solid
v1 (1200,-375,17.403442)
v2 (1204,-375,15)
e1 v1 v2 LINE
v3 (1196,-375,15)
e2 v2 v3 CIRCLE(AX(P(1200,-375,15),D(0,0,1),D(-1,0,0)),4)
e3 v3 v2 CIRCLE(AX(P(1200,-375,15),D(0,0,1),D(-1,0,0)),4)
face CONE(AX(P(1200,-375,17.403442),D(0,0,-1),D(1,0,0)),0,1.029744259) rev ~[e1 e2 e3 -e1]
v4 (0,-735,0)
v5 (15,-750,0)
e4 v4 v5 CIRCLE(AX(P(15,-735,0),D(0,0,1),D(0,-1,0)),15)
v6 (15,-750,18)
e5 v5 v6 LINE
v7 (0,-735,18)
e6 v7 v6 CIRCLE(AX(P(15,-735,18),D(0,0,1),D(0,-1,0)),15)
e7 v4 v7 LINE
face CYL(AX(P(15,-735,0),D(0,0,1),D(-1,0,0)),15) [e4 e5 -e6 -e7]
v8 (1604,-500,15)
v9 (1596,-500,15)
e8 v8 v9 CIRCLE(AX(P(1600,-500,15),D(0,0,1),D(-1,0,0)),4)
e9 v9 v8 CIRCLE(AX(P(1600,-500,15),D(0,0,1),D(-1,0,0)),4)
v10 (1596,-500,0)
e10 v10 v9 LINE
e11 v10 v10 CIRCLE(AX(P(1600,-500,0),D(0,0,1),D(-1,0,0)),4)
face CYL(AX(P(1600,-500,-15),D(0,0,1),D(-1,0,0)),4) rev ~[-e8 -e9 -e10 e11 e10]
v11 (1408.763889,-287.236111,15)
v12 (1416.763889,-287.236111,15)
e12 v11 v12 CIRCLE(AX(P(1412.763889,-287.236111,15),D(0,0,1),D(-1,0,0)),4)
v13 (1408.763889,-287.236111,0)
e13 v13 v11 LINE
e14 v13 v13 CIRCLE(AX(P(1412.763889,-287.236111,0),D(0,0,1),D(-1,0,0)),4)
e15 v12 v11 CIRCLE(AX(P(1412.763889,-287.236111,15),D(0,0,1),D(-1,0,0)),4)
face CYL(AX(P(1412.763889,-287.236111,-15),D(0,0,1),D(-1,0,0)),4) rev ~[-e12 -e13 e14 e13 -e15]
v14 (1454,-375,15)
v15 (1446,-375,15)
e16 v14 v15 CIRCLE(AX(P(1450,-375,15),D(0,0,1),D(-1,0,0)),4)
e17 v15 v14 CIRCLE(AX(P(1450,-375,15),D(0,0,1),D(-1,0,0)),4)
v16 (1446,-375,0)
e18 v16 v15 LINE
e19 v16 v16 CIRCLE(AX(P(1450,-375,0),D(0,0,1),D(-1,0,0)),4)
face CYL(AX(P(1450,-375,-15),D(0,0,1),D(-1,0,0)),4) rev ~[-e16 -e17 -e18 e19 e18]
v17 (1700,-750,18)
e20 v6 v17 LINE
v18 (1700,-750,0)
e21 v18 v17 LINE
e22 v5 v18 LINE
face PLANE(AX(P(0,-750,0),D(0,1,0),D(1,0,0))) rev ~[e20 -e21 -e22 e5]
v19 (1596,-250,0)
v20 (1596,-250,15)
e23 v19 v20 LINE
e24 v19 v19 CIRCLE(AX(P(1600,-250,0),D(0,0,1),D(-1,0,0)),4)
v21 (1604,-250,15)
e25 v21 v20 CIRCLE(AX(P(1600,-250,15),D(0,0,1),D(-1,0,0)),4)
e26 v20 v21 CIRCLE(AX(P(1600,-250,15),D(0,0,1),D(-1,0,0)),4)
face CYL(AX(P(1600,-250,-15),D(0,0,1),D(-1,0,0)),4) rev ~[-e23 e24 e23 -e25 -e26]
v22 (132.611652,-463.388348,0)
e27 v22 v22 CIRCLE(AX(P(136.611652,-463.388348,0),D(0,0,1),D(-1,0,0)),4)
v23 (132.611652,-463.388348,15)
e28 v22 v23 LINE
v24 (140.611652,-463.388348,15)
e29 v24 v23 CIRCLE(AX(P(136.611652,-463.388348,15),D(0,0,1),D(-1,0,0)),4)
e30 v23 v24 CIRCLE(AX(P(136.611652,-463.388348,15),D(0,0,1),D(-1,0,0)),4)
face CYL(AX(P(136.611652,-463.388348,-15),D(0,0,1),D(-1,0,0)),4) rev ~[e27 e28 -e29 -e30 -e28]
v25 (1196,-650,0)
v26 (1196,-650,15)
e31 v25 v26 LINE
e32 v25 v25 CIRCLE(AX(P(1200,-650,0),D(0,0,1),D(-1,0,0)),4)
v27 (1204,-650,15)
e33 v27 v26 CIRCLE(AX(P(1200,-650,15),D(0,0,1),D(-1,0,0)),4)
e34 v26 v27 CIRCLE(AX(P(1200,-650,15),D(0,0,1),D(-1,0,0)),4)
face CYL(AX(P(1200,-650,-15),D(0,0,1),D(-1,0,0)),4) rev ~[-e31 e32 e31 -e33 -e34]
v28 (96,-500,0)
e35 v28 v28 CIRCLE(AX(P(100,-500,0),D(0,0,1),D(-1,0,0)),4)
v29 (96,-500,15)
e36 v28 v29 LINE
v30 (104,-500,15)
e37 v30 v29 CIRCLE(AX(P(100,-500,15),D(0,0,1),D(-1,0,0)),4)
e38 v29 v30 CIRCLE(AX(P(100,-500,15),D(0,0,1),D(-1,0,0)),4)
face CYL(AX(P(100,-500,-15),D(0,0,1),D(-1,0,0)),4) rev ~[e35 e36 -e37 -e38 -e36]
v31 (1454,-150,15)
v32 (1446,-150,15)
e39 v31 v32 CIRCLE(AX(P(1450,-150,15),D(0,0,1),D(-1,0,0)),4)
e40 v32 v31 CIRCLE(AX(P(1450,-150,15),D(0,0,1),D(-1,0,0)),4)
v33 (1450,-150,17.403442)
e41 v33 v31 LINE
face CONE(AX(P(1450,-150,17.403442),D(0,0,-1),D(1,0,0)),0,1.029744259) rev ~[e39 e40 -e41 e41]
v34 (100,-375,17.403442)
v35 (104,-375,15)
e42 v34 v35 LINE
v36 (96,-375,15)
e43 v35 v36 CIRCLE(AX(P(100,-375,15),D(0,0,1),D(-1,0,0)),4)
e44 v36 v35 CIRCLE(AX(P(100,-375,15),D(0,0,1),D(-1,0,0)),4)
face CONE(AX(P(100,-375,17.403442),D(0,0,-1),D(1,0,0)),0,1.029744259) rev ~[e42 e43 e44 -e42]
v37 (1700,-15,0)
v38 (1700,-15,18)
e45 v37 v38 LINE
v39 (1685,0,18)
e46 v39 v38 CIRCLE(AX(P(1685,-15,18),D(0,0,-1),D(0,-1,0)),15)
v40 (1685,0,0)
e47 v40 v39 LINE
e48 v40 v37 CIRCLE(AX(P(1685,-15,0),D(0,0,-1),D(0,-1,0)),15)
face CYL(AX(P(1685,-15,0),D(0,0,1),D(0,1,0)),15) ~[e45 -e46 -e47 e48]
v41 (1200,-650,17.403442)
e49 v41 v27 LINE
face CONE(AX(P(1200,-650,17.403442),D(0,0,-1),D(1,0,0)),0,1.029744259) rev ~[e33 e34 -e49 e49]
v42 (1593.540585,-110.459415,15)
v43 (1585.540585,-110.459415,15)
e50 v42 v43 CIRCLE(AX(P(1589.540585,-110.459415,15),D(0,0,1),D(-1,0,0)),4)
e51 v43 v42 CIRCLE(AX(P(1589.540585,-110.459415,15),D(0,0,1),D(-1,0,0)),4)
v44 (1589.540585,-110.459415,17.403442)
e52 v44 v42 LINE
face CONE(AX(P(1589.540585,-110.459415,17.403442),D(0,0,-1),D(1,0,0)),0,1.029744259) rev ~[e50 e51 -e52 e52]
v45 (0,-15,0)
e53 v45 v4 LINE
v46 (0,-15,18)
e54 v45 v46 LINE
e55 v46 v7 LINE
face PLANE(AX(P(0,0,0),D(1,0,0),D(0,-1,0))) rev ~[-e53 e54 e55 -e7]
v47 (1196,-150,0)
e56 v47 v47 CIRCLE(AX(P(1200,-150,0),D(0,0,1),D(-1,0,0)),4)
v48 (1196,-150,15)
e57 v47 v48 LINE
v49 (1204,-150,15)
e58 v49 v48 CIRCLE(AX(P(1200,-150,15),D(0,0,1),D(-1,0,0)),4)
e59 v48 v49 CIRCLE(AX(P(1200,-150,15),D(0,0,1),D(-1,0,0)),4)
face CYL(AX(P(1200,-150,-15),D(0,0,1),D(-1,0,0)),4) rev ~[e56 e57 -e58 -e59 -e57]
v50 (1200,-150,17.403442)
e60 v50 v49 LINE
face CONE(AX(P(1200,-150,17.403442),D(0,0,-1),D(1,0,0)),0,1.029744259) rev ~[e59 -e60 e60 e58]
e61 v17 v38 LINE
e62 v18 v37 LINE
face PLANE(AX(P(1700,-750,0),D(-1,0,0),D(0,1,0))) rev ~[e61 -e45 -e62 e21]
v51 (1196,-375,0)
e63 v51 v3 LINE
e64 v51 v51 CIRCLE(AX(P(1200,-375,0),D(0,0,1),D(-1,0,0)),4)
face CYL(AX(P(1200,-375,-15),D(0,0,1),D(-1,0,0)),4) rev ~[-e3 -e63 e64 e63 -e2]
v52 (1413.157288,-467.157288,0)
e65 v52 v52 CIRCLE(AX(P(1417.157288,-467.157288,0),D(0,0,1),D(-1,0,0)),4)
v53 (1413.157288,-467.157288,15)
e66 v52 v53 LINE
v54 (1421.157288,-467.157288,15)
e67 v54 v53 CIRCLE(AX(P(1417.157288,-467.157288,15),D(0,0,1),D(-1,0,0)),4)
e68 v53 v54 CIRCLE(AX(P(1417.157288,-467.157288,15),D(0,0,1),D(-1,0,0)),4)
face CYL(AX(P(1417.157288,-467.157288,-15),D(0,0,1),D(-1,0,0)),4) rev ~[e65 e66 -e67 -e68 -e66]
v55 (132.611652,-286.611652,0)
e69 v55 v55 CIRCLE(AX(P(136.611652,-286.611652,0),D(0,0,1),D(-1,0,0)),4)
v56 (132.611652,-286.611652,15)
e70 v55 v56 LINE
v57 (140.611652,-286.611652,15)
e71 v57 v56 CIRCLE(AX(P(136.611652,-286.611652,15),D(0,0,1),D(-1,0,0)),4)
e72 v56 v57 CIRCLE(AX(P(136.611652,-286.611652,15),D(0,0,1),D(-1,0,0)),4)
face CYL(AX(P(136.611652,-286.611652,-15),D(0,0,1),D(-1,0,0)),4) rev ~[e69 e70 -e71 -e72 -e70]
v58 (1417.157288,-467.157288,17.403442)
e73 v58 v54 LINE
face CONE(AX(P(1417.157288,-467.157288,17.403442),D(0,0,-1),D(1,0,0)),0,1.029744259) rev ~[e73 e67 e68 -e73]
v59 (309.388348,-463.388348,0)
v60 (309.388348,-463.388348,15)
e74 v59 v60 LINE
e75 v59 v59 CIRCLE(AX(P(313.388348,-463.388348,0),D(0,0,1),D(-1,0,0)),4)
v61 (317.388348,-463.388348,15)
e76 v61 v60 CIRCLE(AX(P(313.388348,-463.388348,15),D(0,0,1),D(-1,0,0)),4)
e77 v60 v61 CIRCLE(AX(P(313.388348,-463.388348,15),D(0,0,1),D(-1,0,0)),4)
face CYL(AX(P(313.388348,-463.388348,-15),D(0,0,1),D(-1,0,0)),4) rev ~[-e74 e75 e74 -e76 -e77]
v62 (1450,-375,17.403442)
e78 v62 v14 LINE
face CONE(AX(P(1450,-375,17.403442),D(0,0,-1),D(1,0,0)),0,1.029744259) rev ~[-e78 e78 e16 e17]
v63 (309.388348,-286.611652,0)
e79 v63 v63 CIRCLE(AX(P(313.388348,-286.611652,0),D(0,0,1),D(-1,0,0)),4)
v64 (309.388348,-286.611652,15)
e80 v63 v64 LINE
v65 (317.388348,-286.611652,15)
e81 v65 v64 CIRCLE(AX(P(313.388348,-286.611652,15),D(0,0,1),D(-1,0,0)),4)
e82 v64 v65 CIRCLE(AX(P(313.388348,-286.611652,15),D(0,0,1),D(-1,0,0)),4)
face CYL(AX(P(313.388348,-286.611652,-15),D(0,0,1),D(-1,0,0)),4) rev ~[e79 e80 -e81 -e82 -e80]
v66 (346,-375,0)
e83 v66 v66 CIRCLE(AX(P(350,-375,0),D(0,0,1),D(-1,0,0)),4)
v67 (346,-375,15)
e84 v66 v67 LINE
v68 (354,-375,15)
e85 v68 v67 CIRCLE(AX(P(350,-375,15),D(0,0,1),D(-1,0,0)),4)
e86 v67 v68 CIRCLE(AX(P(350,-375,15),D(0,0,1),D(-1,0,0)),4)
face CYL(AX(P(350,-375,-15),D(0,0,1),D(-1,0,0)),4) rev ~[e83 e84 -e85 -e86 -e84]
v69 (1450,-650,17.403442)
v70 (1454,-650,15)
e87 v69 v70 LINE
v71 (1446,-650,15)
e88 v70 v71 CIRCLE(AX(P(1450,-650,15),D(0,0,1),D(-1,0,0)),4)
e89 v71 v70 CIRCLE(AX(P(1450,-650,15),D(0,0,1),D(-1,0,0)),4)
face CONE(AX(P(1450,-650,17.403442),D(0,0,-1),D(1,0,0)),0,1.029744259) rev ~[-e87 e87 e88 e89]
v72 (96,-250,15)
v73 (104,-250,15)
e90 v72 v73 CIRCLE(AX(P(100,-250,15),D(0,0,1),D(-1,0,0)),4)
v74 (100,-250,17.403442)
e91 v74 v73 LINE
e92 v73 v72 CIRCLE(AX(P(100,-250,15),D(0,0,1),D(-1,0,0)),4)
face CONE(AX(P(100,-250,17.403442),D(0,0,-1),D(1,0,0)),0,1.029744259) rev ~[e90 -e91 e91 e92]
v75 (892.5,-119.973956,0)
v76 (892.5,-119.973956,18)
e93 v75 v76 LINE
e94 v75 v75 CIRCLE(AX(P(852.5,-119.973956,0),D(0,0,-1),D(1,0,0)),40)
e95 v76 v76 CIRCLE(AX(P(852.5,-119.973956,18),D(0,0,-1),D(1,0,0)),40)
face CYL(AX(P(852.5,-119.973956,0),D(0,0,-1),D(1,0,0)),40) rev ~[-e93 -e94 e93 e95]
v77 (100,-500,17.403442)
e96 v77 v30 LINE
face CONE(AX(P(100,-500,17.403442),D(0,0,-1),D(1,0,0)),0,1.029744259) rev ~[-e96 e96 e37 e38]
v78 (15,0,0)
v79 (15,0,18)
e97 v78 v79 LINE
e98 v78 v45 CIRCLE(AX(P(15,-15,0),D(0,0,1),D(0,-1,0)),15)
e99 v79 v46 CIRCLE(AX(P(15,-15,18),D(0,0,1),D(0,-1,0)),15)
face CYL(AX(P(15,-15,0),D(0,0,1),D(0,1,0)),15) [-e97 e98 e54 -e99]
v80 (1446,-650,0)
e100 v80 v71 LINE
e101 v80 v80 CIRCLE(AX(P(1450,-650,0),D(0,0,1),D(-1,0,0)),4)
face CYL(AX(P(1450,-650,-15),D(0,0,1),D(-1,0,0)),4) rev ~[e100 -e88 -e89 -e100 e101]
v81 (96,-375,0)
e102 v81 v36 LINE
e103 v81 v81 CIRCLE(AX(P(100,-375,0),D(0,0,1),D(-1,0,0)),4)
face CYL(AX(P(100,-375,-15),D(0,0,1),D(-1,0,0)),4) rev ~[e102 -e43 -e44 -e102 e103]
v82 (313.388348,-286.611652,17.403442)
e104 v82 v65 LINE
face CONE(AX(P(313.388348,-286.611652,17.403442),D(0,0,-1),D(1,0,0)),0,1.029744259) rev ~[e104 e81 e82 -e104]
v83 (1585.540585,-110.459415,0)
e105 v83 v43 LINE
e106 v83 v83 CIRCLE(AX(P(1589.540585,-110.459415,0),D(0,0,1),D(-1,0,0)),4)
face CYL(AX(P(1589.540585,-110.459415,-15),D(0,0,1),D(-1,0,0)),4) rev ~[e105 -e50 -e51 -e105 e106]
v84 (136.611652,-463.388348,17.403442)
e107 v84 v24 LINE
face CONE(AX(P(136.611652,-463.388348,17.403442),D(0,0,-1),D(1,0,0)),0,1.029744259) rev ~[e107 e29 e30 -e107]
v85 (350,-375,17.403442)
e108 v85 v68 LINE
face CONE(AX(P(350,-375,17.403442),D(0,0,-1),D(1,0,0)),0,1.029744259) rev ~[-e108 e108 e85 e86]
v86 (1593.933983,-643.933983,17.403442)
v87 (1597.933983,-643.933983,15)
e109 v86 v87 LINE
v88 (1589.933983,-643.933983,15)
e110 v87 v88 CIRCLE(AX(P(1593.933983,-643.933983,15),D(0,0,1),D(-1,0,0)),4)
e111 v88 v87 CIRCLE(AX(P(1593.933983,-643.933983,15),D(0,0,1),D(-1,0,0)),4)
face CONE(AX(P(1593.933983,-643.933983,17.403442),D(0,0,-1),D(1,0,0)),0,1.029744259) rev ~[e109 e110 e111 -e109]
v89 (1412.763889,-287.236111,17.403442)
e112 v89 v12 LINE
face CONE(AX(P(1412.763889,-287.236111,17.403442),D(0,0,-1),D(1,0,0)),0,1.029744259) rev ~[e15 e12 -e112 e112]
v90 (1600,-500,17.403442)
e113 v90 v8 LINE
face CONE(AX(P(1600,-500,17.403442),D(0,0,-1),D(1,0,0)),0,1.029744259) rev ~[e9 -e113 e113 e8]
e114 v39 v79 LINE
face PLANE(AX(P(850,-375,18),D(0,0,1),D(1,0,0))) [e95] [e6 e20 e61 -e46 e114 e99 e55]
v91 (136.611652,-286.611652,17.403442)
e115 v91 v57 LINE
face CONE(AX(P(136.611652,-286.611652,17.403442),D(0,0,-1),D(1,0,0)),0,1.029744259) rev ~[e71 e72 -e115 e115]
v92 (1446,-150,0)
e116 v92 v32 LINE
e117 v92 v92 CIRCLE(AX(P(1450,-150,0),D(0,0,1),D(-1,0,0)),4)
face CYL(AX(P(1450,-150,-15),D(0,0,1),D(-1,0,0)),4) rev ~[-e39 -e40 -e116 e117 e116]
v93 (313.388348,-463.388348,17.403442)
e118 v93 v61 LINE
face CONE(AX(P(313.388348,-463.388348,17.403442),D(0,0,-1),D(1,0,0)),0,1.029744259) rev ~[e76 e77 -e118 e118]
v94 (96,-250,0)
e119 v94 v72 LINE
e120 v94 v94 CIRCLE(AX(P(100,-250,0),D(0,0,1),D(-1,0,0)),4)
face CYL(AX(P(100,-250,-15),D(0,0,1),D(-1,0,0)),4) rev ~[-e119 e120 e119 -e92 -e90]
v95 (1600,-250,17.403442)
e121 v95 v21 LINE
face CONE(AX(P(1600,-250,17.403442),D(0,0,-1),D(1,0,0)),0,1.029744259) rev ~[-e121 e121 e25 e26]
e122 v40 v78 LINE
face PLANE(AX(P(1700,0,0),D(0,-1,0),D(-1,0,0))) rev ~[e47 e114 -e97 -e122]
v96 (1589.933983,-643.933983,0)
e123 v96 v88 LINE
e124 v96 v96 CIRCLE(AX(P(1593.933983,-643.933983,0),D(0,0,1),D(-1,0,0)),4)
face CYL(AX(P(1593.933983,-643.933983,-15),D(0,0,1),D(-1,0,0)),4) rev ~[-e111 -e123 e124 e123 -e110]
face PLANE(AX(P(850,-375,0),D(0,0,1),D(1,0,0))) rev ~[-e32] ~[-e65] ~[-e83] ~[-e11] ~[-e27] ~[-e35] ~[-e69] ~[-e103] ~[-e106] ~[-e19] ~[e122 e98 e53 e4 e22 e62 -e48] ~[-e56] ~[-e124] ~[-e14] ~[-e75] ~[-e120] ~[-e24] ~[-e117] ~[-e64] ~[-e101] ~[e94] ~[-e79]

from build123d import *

# Parameters (mm, degrees)
F1_DEPTH = 18
F2_R     = 15
F4_D     = 8
F4_DEPTH = 15
F4_TIP   = 2.4034424761
F6_DEPTH = 18


# Not quite as in the source:
# - a feature names something its author has since deleted; it is built from what else it names


with BuildPart() as f1:
    # F0 (on Top) → F1 (new body)
    with BuildSketch(Plane.XY):
        Polygon((1700, 0), (0, 0), (0, -750), (1690, -750), (1700, -750), align=None)
    extrude(amount=F1_DEPTH)

    # F2
    f2_edges = [f1.edges().sort_by_distance(p)[0] for p in [
        (0, -750, 9),
        (0, 0, 9),
        (1700, 0, 9),
    ]]
    fillet(f2_edges, radius=F2_R)

    # F4
    with Locations(Plane(origin=(0, 0, 0), x_dir=(1, 0, 0), z_dir=(0, 0, -1))):
        with Locations((136.6116523517, 286.6116523517), (100, 250), (100, 375), (136.6116523517, 463.3883476483), (100, 500), (313.3883476483, 463.3883476483), (350, 375), (313.3883476483, 286.6116523517), (1200, 150), (1450, 150), (1589.5405845398, 110.4594154602), (1600, 250), (1450, 375), (1200, 375), (1417.1572875254, 467.1572875254), (1600, 500), (1593.933982822, 643.933982822), (1450, 650), (1200, 650), (1412.7638892432, 287.2361107568)):
            Hole(F4_D / 2, depth=F4_DEPTH)
            with Locations((0, 0, -(F4_DEPTH + F4_TIP / 2))):  # 118° drill point
                Cone(0, F4_D / 2, F4_TIP, mode=Mode.SUBTRACT)

    # F5 (on face) → F6 (cut)
    with BuildSketch(Plane(origin=(0, 0, 0), x_dir=(1, 0, 0), z_dir=(0, 0, -1))):
        with BuildLine():
            ThreePointArc((851.6666666667, 79.9826370047), (880.4880927062, 91.3965751745), (892.5, 119.973955507))
            ThreePointArc((892.5, 119.973955507), (824.5119072938, 148.5513358395), (851.6666666667, 79.9826370047))
        make_face()
    extrude(amount=-F6_DEPTH, mode=Mode.SUBTRACT)


solid = f1.part
